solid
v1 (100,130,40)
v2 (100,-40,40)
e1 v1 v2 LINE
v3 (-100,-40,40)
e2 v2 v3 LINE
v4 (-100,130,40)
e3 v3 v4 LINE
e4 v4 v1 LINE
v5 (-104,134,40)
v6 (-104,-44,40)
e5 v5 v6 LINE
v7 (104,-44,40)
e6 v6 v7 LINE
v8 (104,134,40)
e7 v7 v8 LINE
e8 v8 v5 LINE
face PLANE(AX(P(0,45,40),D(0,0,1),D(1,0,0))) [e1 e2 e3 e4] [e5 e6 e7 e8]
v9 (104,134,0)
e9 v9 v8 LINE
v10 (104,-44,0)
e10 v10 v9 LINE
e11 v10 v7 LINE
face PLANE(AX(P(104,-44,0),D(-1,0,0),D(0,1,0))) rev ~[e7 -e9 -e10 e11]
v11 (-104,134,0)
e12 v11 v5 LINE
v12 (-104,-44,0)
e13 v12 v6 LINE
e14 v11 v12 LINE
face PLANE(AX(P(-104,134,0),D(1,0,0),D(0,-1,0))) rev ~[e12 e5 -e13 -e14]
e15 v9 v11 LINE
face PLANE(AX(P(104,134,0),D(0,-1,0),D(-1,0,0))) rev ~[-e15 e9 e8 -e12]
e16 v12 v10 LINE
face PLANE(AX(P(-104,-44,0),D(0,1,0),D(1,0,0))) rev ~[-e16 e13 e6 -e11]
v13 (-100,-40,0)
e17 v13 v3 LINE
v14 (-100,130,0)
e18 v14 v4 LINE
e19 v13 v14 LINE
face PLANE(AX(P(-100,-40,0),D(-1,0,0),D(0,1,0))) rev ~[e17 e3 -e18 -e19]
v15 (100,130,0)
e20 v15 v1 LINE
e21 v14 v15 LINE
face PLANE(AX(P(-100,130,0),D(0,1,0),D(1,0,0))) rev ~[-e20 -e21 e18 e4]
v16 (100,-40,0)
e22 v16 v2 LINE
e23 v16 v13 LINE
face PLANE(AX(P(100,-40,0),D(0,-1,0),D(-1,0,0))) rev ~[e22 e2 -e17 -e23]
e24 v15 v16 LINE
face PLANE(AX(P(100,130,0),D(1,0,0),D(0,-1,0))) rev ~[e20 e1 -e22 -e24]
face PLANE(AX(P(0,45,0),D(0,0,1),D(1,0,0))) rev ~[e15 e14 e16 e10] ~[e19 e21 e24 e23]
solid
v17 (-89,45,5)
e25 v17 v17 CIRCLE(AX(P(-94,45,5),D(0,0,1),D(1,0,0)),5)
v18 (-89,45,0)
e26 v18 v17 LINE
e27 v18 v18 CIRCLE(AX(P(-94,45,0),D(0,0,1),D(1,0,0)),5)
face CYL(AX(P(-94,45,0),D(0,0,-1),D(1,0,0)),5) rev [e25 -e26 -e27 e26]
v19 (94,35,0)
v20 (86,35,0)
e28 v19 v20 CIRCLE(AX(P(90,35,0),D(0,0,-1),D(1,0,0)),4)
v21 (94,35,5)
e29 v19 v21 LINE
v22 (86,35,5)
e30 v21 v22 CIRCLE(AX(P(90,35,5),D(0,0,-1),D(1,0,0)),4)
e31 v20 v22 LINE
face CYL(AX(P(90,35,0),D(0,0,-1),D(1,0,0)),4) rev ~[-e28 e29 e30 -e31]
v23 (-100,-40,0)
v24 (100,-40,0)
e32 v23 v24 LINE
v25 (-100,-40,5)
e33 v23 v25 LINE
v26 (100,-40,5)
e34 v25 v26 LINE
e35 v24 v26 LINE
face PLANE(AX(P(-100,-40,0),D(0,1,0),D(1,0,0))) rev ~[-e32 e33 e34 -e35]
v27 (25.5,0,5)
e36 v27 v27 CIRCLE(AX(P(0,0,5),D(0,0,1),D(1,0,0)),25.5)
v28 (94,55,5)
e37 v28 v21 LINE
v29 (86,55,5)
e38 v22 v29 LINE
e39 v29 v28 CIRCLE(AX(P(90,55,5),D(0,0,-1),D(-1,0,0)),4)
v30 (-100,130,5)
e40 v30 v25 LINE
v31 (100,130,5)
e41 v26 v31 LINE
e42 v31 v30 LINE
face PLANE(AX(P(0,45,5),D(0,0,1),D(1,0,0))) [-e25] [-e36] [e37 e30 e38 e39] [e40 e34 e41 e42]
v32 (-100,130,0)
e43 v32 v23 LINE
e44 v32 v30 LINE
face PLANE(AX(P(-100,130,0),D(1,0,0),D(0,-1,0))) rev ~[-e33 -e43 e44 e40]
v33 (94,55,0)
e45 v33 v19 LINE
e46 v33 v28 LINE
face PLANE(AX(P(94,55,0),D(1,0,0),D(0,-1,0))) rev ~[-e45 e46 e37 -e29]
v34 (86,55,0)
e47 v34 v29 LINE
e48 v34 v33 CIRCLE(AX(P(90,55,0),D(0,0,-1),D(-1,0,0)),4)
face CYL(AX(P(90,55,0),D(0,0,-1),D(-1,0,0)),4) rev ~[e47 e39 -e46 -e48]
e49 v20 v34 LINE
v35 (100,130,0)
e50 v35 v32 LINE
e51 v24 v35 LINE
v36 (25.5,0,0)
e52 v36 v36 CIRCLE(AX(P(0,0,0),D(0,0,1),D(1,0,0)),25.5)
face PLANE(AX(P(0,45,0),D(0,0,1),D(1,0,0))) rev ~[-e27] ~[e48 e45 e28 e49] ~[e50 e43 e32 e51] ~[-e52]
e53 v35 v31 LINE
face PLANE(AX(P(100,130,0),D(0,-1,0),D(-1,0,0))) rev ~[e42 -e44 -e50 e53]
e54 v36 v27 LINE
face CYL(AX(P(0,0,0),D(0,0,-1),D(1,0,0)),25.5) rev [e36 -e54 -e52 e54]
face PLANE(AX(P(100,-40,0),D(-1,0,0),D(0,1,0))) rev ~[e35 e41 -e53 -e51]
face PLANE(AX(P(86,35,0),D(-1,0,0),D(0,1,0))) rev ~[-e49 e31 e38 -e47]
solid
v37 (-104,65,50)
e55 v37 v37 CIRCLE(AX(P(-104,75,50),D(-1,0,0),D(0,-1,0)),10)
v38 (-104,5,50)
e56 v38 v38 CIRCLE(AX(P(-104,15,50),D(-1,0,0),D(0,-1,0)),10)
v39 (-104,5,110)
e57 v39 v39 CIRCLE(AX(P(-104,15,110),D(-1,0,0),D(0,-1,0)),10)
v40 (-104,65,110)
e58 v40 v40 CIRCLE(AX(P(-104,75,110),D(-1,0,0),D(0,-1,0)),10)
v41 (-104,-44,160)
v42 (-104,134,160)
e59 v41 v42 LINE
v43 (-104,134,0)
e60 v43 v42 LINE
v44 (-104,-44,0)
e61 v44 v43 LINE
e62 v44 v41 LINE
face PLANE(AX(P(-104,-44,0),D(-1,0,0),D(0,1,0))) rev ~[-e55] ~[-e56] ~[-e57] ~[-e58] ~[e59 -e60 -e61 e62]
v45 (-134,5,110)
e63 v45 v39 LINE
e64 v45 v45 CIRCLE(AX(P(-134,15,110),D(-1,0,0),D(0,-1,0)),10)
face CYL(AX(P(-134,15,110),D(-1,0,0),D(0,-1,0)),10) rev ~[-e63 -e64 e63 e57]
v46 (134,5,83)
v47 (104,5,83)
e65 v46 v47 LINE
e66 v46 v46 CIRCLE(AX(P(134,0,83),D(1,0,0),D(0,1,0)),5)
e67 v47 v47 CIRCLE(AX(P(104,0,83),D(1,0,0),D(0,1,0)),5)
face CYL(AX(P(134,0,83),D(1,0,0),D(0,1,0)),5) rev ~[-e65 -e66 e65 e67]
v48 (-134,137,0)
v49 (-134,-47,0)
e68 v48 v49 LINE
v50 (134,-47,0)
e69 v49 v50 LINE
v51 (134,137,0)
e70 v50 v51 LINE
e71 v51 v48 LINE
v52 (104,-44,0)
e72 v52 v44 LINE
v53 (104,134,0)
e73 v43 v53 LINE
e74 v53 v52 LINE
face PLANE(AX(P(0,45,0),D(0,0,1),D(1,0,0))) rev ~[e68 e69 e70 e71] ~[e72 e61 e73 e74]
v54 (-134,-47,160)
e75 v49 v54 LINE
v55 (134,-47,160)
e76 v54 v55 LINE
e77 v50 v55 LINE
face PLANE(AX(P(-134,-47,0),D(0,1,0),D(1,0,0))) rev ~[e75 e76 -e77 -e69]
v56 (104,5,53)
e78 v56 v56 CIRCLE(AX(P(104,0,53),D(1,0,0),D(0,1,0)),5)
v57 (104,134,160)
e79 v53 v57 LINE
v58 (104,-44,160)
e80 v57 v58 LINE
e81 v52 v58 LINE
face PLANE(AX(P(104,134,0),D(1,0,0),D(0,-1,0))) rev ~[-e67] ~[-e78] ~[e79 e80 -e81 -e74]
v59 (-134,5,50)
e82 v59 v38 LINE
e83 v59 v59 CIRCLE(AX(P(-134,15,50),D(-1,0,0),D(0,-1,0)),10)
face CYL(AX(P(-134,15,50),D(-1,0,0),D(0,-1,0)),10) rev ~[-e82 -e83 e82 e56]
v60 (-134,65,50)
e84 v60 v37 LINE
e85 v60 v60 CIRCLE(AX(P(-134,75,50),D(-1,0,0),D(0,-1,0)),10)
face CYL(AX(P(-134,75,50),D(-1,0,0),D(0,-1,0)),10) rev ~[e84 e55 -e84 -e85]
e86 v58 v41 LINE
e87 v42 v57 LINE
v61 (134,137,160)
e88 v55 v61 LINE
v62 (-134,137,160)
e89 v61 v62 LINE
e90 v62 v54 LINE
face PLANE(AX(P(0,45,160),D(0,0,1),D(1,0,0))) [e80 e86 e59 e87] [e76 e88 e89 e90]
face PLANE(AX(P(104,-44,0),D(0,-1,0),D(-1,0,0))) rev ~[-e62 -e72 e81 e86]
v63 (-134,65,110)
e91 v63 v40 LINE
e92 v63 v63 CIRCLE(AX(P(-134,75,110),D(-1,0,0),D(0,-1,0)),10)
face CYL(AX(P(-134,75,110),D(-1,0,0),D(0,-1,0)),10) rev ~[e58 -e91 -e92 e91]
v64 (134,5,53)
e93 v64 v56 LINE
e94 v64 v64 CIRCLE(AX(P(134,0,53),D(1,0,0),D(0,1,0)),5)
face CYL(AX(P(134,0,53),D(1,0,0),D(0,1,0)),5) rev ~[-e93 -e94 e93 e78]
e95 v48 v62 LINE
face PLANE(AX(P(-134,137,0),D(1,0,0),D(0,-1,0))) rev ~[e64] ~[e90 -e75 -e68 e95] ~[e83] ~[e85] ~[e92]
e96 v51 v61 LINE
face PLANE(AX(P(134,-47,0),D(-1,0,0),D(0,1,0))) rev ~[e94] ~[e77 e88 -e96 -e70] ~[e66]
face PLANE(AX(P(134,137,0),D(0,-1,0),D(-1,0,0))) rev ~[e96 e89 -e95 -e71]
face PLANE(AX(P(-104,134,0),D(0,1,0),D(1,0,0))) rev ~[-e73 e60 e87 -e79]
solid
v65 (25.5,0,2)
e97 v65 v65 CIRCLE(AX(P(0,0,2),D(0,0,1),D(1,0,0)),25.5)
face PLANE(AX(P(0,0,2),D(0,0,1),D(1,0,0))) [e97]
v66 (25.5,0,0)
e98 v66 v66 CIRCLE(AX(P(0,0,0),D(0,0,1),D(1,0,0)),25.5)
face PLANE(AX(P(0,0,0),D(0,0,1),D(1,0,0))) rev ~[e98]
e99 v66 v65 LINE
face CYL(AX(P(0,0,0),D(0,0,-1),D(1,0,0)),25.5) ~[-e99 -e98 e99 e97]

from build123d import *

# Parameters (mm, degrees)
F0_R      = 25.5
F1_DEPTH  = 2
F0_R_2    = 5
F2_DEPTH  = 5
F3_DEPTH  = 160
F4_DEPTH  = 40
F5_R      = 5
F6_DEPTH  = 30.3
F7_DEPTH  = 30
F8_DEPTH  = 10
F9_R      = 10
F10_DEPTH = 30


# Not quite as in the source:
# - a feature names something its author has since deleted; it is built from what else it names


with BuildPart() as f1:
    # F0 (on Top) → F1 (new body)
    with BuildSketch(Plane.XY):
        Circle(F0_R)
    extrude(amount=F1_DEPTH)

    # F0 (on Top) → F8 (cut)
    with BuildSketch(Plane.XY):
        with BuildLine():
            Line((94, 35), (94, 45))
            Line((94, 45), (94, 55))
            ThreePointArc((94, 55), (90, 59), (86, 55))
            Line((86, 55), (86, 35))
            ThreePointArc((86, 35), (90, 31), (94, 35))
        make_face()
    extrude(amount=F8_DEPTH, mode=Mode.SUBTRACT)


with BuildPart() as f2:
    # F0 (on Top) → F2 (new body)
    with BuildSketch(Plane.XY):
        Polygon((100, -40), (100, 45), (100, 130), (-100, 130), (-100, -40), align=None)
        Circle(F0_R, mode=Mode.SUBTRACT)
        with Locations((-94, 45)):
            Circle(F0_R_2, mode=Mode.SUBTRACT)
        with BuildLine():
            Line((94, 55), (94, 45))
            Line((94, 45), (94, 35))
            ThreePointArc((94, 35), (90, 31), (86, 35))
            Line((86, 35), (86, 55))
            ThreePointArc((86, 55), (90, 59), (94, 55))
        make_face(mode=Mode.SUBTRACT)
    extrude(amount=F2_DEPTH)


with BuildPart() as f3:
    # F0 (on Top) → F3 (new body)
    with BuildSketch(Plane.XY):
        Polygon((-134, -47), (134, -47), (134, 45), (134, 137), (-134, 137), align=None)
        Polygon((104, 134), (104, 45), (104, -44), (-104, -44), (-104, 134), align=None, mode=Mode.SUBTRACT)
    extrude(amount=F3_DEPTH)

    # F5 (on face) → F6 (cut)
    with BuildSketch(Plane.YZ.offset(134)):
        with Locations((0, 83)):
            Circle(F5_R)
    extrude(amount=-F6_DEPTH, mode=Mode.SUBTRACT)

    # F5 (on face) → F7 (cut)
    with BuildSketch(Plane.YZ.offset(134)):
        with Locations((0, 53)):
            Circle(F5_R)
    extrude(amount=-F7_DEPTH, mode=Mode.SUBTRACT)

    # F9 (on face) → F10 (cut, through all)
    with BuildSketch(Plane(origin=(-134, 0, 0), x_dir=(0, -1, 0), z_dir=(-1, 0, 0))):
        with Locations((-75, 110)):
            Circle(F9_R)
        with Locations((-15, 110)):
            Circle(F9_R)
        with Locations((-75, 50)):
            Circle(F9_R)
        with Locations((-15, 50)):
            Circle(F9_R)
    extrude(amount=-F10_DEPTH, mode=Mode.SUBTRACT)


with BuildPart() as f4:
    # F0 (on Top) → F4 (new body)
    with BuildSketch(Plane.XY):
        Polygon((104, -44), (104, 45), (104, 134), (-104, 134), (-104, -44), align=None)
        Polygon((100, 130), (100, 45), (100, -40), (-100, -40), (-100, 130), align=None, mode=Mode.SUBTRACT)
    extrude(amount=F4_DEPTH)


solid = Compound([f1.part, f2.part, f3.part, f4.part])
